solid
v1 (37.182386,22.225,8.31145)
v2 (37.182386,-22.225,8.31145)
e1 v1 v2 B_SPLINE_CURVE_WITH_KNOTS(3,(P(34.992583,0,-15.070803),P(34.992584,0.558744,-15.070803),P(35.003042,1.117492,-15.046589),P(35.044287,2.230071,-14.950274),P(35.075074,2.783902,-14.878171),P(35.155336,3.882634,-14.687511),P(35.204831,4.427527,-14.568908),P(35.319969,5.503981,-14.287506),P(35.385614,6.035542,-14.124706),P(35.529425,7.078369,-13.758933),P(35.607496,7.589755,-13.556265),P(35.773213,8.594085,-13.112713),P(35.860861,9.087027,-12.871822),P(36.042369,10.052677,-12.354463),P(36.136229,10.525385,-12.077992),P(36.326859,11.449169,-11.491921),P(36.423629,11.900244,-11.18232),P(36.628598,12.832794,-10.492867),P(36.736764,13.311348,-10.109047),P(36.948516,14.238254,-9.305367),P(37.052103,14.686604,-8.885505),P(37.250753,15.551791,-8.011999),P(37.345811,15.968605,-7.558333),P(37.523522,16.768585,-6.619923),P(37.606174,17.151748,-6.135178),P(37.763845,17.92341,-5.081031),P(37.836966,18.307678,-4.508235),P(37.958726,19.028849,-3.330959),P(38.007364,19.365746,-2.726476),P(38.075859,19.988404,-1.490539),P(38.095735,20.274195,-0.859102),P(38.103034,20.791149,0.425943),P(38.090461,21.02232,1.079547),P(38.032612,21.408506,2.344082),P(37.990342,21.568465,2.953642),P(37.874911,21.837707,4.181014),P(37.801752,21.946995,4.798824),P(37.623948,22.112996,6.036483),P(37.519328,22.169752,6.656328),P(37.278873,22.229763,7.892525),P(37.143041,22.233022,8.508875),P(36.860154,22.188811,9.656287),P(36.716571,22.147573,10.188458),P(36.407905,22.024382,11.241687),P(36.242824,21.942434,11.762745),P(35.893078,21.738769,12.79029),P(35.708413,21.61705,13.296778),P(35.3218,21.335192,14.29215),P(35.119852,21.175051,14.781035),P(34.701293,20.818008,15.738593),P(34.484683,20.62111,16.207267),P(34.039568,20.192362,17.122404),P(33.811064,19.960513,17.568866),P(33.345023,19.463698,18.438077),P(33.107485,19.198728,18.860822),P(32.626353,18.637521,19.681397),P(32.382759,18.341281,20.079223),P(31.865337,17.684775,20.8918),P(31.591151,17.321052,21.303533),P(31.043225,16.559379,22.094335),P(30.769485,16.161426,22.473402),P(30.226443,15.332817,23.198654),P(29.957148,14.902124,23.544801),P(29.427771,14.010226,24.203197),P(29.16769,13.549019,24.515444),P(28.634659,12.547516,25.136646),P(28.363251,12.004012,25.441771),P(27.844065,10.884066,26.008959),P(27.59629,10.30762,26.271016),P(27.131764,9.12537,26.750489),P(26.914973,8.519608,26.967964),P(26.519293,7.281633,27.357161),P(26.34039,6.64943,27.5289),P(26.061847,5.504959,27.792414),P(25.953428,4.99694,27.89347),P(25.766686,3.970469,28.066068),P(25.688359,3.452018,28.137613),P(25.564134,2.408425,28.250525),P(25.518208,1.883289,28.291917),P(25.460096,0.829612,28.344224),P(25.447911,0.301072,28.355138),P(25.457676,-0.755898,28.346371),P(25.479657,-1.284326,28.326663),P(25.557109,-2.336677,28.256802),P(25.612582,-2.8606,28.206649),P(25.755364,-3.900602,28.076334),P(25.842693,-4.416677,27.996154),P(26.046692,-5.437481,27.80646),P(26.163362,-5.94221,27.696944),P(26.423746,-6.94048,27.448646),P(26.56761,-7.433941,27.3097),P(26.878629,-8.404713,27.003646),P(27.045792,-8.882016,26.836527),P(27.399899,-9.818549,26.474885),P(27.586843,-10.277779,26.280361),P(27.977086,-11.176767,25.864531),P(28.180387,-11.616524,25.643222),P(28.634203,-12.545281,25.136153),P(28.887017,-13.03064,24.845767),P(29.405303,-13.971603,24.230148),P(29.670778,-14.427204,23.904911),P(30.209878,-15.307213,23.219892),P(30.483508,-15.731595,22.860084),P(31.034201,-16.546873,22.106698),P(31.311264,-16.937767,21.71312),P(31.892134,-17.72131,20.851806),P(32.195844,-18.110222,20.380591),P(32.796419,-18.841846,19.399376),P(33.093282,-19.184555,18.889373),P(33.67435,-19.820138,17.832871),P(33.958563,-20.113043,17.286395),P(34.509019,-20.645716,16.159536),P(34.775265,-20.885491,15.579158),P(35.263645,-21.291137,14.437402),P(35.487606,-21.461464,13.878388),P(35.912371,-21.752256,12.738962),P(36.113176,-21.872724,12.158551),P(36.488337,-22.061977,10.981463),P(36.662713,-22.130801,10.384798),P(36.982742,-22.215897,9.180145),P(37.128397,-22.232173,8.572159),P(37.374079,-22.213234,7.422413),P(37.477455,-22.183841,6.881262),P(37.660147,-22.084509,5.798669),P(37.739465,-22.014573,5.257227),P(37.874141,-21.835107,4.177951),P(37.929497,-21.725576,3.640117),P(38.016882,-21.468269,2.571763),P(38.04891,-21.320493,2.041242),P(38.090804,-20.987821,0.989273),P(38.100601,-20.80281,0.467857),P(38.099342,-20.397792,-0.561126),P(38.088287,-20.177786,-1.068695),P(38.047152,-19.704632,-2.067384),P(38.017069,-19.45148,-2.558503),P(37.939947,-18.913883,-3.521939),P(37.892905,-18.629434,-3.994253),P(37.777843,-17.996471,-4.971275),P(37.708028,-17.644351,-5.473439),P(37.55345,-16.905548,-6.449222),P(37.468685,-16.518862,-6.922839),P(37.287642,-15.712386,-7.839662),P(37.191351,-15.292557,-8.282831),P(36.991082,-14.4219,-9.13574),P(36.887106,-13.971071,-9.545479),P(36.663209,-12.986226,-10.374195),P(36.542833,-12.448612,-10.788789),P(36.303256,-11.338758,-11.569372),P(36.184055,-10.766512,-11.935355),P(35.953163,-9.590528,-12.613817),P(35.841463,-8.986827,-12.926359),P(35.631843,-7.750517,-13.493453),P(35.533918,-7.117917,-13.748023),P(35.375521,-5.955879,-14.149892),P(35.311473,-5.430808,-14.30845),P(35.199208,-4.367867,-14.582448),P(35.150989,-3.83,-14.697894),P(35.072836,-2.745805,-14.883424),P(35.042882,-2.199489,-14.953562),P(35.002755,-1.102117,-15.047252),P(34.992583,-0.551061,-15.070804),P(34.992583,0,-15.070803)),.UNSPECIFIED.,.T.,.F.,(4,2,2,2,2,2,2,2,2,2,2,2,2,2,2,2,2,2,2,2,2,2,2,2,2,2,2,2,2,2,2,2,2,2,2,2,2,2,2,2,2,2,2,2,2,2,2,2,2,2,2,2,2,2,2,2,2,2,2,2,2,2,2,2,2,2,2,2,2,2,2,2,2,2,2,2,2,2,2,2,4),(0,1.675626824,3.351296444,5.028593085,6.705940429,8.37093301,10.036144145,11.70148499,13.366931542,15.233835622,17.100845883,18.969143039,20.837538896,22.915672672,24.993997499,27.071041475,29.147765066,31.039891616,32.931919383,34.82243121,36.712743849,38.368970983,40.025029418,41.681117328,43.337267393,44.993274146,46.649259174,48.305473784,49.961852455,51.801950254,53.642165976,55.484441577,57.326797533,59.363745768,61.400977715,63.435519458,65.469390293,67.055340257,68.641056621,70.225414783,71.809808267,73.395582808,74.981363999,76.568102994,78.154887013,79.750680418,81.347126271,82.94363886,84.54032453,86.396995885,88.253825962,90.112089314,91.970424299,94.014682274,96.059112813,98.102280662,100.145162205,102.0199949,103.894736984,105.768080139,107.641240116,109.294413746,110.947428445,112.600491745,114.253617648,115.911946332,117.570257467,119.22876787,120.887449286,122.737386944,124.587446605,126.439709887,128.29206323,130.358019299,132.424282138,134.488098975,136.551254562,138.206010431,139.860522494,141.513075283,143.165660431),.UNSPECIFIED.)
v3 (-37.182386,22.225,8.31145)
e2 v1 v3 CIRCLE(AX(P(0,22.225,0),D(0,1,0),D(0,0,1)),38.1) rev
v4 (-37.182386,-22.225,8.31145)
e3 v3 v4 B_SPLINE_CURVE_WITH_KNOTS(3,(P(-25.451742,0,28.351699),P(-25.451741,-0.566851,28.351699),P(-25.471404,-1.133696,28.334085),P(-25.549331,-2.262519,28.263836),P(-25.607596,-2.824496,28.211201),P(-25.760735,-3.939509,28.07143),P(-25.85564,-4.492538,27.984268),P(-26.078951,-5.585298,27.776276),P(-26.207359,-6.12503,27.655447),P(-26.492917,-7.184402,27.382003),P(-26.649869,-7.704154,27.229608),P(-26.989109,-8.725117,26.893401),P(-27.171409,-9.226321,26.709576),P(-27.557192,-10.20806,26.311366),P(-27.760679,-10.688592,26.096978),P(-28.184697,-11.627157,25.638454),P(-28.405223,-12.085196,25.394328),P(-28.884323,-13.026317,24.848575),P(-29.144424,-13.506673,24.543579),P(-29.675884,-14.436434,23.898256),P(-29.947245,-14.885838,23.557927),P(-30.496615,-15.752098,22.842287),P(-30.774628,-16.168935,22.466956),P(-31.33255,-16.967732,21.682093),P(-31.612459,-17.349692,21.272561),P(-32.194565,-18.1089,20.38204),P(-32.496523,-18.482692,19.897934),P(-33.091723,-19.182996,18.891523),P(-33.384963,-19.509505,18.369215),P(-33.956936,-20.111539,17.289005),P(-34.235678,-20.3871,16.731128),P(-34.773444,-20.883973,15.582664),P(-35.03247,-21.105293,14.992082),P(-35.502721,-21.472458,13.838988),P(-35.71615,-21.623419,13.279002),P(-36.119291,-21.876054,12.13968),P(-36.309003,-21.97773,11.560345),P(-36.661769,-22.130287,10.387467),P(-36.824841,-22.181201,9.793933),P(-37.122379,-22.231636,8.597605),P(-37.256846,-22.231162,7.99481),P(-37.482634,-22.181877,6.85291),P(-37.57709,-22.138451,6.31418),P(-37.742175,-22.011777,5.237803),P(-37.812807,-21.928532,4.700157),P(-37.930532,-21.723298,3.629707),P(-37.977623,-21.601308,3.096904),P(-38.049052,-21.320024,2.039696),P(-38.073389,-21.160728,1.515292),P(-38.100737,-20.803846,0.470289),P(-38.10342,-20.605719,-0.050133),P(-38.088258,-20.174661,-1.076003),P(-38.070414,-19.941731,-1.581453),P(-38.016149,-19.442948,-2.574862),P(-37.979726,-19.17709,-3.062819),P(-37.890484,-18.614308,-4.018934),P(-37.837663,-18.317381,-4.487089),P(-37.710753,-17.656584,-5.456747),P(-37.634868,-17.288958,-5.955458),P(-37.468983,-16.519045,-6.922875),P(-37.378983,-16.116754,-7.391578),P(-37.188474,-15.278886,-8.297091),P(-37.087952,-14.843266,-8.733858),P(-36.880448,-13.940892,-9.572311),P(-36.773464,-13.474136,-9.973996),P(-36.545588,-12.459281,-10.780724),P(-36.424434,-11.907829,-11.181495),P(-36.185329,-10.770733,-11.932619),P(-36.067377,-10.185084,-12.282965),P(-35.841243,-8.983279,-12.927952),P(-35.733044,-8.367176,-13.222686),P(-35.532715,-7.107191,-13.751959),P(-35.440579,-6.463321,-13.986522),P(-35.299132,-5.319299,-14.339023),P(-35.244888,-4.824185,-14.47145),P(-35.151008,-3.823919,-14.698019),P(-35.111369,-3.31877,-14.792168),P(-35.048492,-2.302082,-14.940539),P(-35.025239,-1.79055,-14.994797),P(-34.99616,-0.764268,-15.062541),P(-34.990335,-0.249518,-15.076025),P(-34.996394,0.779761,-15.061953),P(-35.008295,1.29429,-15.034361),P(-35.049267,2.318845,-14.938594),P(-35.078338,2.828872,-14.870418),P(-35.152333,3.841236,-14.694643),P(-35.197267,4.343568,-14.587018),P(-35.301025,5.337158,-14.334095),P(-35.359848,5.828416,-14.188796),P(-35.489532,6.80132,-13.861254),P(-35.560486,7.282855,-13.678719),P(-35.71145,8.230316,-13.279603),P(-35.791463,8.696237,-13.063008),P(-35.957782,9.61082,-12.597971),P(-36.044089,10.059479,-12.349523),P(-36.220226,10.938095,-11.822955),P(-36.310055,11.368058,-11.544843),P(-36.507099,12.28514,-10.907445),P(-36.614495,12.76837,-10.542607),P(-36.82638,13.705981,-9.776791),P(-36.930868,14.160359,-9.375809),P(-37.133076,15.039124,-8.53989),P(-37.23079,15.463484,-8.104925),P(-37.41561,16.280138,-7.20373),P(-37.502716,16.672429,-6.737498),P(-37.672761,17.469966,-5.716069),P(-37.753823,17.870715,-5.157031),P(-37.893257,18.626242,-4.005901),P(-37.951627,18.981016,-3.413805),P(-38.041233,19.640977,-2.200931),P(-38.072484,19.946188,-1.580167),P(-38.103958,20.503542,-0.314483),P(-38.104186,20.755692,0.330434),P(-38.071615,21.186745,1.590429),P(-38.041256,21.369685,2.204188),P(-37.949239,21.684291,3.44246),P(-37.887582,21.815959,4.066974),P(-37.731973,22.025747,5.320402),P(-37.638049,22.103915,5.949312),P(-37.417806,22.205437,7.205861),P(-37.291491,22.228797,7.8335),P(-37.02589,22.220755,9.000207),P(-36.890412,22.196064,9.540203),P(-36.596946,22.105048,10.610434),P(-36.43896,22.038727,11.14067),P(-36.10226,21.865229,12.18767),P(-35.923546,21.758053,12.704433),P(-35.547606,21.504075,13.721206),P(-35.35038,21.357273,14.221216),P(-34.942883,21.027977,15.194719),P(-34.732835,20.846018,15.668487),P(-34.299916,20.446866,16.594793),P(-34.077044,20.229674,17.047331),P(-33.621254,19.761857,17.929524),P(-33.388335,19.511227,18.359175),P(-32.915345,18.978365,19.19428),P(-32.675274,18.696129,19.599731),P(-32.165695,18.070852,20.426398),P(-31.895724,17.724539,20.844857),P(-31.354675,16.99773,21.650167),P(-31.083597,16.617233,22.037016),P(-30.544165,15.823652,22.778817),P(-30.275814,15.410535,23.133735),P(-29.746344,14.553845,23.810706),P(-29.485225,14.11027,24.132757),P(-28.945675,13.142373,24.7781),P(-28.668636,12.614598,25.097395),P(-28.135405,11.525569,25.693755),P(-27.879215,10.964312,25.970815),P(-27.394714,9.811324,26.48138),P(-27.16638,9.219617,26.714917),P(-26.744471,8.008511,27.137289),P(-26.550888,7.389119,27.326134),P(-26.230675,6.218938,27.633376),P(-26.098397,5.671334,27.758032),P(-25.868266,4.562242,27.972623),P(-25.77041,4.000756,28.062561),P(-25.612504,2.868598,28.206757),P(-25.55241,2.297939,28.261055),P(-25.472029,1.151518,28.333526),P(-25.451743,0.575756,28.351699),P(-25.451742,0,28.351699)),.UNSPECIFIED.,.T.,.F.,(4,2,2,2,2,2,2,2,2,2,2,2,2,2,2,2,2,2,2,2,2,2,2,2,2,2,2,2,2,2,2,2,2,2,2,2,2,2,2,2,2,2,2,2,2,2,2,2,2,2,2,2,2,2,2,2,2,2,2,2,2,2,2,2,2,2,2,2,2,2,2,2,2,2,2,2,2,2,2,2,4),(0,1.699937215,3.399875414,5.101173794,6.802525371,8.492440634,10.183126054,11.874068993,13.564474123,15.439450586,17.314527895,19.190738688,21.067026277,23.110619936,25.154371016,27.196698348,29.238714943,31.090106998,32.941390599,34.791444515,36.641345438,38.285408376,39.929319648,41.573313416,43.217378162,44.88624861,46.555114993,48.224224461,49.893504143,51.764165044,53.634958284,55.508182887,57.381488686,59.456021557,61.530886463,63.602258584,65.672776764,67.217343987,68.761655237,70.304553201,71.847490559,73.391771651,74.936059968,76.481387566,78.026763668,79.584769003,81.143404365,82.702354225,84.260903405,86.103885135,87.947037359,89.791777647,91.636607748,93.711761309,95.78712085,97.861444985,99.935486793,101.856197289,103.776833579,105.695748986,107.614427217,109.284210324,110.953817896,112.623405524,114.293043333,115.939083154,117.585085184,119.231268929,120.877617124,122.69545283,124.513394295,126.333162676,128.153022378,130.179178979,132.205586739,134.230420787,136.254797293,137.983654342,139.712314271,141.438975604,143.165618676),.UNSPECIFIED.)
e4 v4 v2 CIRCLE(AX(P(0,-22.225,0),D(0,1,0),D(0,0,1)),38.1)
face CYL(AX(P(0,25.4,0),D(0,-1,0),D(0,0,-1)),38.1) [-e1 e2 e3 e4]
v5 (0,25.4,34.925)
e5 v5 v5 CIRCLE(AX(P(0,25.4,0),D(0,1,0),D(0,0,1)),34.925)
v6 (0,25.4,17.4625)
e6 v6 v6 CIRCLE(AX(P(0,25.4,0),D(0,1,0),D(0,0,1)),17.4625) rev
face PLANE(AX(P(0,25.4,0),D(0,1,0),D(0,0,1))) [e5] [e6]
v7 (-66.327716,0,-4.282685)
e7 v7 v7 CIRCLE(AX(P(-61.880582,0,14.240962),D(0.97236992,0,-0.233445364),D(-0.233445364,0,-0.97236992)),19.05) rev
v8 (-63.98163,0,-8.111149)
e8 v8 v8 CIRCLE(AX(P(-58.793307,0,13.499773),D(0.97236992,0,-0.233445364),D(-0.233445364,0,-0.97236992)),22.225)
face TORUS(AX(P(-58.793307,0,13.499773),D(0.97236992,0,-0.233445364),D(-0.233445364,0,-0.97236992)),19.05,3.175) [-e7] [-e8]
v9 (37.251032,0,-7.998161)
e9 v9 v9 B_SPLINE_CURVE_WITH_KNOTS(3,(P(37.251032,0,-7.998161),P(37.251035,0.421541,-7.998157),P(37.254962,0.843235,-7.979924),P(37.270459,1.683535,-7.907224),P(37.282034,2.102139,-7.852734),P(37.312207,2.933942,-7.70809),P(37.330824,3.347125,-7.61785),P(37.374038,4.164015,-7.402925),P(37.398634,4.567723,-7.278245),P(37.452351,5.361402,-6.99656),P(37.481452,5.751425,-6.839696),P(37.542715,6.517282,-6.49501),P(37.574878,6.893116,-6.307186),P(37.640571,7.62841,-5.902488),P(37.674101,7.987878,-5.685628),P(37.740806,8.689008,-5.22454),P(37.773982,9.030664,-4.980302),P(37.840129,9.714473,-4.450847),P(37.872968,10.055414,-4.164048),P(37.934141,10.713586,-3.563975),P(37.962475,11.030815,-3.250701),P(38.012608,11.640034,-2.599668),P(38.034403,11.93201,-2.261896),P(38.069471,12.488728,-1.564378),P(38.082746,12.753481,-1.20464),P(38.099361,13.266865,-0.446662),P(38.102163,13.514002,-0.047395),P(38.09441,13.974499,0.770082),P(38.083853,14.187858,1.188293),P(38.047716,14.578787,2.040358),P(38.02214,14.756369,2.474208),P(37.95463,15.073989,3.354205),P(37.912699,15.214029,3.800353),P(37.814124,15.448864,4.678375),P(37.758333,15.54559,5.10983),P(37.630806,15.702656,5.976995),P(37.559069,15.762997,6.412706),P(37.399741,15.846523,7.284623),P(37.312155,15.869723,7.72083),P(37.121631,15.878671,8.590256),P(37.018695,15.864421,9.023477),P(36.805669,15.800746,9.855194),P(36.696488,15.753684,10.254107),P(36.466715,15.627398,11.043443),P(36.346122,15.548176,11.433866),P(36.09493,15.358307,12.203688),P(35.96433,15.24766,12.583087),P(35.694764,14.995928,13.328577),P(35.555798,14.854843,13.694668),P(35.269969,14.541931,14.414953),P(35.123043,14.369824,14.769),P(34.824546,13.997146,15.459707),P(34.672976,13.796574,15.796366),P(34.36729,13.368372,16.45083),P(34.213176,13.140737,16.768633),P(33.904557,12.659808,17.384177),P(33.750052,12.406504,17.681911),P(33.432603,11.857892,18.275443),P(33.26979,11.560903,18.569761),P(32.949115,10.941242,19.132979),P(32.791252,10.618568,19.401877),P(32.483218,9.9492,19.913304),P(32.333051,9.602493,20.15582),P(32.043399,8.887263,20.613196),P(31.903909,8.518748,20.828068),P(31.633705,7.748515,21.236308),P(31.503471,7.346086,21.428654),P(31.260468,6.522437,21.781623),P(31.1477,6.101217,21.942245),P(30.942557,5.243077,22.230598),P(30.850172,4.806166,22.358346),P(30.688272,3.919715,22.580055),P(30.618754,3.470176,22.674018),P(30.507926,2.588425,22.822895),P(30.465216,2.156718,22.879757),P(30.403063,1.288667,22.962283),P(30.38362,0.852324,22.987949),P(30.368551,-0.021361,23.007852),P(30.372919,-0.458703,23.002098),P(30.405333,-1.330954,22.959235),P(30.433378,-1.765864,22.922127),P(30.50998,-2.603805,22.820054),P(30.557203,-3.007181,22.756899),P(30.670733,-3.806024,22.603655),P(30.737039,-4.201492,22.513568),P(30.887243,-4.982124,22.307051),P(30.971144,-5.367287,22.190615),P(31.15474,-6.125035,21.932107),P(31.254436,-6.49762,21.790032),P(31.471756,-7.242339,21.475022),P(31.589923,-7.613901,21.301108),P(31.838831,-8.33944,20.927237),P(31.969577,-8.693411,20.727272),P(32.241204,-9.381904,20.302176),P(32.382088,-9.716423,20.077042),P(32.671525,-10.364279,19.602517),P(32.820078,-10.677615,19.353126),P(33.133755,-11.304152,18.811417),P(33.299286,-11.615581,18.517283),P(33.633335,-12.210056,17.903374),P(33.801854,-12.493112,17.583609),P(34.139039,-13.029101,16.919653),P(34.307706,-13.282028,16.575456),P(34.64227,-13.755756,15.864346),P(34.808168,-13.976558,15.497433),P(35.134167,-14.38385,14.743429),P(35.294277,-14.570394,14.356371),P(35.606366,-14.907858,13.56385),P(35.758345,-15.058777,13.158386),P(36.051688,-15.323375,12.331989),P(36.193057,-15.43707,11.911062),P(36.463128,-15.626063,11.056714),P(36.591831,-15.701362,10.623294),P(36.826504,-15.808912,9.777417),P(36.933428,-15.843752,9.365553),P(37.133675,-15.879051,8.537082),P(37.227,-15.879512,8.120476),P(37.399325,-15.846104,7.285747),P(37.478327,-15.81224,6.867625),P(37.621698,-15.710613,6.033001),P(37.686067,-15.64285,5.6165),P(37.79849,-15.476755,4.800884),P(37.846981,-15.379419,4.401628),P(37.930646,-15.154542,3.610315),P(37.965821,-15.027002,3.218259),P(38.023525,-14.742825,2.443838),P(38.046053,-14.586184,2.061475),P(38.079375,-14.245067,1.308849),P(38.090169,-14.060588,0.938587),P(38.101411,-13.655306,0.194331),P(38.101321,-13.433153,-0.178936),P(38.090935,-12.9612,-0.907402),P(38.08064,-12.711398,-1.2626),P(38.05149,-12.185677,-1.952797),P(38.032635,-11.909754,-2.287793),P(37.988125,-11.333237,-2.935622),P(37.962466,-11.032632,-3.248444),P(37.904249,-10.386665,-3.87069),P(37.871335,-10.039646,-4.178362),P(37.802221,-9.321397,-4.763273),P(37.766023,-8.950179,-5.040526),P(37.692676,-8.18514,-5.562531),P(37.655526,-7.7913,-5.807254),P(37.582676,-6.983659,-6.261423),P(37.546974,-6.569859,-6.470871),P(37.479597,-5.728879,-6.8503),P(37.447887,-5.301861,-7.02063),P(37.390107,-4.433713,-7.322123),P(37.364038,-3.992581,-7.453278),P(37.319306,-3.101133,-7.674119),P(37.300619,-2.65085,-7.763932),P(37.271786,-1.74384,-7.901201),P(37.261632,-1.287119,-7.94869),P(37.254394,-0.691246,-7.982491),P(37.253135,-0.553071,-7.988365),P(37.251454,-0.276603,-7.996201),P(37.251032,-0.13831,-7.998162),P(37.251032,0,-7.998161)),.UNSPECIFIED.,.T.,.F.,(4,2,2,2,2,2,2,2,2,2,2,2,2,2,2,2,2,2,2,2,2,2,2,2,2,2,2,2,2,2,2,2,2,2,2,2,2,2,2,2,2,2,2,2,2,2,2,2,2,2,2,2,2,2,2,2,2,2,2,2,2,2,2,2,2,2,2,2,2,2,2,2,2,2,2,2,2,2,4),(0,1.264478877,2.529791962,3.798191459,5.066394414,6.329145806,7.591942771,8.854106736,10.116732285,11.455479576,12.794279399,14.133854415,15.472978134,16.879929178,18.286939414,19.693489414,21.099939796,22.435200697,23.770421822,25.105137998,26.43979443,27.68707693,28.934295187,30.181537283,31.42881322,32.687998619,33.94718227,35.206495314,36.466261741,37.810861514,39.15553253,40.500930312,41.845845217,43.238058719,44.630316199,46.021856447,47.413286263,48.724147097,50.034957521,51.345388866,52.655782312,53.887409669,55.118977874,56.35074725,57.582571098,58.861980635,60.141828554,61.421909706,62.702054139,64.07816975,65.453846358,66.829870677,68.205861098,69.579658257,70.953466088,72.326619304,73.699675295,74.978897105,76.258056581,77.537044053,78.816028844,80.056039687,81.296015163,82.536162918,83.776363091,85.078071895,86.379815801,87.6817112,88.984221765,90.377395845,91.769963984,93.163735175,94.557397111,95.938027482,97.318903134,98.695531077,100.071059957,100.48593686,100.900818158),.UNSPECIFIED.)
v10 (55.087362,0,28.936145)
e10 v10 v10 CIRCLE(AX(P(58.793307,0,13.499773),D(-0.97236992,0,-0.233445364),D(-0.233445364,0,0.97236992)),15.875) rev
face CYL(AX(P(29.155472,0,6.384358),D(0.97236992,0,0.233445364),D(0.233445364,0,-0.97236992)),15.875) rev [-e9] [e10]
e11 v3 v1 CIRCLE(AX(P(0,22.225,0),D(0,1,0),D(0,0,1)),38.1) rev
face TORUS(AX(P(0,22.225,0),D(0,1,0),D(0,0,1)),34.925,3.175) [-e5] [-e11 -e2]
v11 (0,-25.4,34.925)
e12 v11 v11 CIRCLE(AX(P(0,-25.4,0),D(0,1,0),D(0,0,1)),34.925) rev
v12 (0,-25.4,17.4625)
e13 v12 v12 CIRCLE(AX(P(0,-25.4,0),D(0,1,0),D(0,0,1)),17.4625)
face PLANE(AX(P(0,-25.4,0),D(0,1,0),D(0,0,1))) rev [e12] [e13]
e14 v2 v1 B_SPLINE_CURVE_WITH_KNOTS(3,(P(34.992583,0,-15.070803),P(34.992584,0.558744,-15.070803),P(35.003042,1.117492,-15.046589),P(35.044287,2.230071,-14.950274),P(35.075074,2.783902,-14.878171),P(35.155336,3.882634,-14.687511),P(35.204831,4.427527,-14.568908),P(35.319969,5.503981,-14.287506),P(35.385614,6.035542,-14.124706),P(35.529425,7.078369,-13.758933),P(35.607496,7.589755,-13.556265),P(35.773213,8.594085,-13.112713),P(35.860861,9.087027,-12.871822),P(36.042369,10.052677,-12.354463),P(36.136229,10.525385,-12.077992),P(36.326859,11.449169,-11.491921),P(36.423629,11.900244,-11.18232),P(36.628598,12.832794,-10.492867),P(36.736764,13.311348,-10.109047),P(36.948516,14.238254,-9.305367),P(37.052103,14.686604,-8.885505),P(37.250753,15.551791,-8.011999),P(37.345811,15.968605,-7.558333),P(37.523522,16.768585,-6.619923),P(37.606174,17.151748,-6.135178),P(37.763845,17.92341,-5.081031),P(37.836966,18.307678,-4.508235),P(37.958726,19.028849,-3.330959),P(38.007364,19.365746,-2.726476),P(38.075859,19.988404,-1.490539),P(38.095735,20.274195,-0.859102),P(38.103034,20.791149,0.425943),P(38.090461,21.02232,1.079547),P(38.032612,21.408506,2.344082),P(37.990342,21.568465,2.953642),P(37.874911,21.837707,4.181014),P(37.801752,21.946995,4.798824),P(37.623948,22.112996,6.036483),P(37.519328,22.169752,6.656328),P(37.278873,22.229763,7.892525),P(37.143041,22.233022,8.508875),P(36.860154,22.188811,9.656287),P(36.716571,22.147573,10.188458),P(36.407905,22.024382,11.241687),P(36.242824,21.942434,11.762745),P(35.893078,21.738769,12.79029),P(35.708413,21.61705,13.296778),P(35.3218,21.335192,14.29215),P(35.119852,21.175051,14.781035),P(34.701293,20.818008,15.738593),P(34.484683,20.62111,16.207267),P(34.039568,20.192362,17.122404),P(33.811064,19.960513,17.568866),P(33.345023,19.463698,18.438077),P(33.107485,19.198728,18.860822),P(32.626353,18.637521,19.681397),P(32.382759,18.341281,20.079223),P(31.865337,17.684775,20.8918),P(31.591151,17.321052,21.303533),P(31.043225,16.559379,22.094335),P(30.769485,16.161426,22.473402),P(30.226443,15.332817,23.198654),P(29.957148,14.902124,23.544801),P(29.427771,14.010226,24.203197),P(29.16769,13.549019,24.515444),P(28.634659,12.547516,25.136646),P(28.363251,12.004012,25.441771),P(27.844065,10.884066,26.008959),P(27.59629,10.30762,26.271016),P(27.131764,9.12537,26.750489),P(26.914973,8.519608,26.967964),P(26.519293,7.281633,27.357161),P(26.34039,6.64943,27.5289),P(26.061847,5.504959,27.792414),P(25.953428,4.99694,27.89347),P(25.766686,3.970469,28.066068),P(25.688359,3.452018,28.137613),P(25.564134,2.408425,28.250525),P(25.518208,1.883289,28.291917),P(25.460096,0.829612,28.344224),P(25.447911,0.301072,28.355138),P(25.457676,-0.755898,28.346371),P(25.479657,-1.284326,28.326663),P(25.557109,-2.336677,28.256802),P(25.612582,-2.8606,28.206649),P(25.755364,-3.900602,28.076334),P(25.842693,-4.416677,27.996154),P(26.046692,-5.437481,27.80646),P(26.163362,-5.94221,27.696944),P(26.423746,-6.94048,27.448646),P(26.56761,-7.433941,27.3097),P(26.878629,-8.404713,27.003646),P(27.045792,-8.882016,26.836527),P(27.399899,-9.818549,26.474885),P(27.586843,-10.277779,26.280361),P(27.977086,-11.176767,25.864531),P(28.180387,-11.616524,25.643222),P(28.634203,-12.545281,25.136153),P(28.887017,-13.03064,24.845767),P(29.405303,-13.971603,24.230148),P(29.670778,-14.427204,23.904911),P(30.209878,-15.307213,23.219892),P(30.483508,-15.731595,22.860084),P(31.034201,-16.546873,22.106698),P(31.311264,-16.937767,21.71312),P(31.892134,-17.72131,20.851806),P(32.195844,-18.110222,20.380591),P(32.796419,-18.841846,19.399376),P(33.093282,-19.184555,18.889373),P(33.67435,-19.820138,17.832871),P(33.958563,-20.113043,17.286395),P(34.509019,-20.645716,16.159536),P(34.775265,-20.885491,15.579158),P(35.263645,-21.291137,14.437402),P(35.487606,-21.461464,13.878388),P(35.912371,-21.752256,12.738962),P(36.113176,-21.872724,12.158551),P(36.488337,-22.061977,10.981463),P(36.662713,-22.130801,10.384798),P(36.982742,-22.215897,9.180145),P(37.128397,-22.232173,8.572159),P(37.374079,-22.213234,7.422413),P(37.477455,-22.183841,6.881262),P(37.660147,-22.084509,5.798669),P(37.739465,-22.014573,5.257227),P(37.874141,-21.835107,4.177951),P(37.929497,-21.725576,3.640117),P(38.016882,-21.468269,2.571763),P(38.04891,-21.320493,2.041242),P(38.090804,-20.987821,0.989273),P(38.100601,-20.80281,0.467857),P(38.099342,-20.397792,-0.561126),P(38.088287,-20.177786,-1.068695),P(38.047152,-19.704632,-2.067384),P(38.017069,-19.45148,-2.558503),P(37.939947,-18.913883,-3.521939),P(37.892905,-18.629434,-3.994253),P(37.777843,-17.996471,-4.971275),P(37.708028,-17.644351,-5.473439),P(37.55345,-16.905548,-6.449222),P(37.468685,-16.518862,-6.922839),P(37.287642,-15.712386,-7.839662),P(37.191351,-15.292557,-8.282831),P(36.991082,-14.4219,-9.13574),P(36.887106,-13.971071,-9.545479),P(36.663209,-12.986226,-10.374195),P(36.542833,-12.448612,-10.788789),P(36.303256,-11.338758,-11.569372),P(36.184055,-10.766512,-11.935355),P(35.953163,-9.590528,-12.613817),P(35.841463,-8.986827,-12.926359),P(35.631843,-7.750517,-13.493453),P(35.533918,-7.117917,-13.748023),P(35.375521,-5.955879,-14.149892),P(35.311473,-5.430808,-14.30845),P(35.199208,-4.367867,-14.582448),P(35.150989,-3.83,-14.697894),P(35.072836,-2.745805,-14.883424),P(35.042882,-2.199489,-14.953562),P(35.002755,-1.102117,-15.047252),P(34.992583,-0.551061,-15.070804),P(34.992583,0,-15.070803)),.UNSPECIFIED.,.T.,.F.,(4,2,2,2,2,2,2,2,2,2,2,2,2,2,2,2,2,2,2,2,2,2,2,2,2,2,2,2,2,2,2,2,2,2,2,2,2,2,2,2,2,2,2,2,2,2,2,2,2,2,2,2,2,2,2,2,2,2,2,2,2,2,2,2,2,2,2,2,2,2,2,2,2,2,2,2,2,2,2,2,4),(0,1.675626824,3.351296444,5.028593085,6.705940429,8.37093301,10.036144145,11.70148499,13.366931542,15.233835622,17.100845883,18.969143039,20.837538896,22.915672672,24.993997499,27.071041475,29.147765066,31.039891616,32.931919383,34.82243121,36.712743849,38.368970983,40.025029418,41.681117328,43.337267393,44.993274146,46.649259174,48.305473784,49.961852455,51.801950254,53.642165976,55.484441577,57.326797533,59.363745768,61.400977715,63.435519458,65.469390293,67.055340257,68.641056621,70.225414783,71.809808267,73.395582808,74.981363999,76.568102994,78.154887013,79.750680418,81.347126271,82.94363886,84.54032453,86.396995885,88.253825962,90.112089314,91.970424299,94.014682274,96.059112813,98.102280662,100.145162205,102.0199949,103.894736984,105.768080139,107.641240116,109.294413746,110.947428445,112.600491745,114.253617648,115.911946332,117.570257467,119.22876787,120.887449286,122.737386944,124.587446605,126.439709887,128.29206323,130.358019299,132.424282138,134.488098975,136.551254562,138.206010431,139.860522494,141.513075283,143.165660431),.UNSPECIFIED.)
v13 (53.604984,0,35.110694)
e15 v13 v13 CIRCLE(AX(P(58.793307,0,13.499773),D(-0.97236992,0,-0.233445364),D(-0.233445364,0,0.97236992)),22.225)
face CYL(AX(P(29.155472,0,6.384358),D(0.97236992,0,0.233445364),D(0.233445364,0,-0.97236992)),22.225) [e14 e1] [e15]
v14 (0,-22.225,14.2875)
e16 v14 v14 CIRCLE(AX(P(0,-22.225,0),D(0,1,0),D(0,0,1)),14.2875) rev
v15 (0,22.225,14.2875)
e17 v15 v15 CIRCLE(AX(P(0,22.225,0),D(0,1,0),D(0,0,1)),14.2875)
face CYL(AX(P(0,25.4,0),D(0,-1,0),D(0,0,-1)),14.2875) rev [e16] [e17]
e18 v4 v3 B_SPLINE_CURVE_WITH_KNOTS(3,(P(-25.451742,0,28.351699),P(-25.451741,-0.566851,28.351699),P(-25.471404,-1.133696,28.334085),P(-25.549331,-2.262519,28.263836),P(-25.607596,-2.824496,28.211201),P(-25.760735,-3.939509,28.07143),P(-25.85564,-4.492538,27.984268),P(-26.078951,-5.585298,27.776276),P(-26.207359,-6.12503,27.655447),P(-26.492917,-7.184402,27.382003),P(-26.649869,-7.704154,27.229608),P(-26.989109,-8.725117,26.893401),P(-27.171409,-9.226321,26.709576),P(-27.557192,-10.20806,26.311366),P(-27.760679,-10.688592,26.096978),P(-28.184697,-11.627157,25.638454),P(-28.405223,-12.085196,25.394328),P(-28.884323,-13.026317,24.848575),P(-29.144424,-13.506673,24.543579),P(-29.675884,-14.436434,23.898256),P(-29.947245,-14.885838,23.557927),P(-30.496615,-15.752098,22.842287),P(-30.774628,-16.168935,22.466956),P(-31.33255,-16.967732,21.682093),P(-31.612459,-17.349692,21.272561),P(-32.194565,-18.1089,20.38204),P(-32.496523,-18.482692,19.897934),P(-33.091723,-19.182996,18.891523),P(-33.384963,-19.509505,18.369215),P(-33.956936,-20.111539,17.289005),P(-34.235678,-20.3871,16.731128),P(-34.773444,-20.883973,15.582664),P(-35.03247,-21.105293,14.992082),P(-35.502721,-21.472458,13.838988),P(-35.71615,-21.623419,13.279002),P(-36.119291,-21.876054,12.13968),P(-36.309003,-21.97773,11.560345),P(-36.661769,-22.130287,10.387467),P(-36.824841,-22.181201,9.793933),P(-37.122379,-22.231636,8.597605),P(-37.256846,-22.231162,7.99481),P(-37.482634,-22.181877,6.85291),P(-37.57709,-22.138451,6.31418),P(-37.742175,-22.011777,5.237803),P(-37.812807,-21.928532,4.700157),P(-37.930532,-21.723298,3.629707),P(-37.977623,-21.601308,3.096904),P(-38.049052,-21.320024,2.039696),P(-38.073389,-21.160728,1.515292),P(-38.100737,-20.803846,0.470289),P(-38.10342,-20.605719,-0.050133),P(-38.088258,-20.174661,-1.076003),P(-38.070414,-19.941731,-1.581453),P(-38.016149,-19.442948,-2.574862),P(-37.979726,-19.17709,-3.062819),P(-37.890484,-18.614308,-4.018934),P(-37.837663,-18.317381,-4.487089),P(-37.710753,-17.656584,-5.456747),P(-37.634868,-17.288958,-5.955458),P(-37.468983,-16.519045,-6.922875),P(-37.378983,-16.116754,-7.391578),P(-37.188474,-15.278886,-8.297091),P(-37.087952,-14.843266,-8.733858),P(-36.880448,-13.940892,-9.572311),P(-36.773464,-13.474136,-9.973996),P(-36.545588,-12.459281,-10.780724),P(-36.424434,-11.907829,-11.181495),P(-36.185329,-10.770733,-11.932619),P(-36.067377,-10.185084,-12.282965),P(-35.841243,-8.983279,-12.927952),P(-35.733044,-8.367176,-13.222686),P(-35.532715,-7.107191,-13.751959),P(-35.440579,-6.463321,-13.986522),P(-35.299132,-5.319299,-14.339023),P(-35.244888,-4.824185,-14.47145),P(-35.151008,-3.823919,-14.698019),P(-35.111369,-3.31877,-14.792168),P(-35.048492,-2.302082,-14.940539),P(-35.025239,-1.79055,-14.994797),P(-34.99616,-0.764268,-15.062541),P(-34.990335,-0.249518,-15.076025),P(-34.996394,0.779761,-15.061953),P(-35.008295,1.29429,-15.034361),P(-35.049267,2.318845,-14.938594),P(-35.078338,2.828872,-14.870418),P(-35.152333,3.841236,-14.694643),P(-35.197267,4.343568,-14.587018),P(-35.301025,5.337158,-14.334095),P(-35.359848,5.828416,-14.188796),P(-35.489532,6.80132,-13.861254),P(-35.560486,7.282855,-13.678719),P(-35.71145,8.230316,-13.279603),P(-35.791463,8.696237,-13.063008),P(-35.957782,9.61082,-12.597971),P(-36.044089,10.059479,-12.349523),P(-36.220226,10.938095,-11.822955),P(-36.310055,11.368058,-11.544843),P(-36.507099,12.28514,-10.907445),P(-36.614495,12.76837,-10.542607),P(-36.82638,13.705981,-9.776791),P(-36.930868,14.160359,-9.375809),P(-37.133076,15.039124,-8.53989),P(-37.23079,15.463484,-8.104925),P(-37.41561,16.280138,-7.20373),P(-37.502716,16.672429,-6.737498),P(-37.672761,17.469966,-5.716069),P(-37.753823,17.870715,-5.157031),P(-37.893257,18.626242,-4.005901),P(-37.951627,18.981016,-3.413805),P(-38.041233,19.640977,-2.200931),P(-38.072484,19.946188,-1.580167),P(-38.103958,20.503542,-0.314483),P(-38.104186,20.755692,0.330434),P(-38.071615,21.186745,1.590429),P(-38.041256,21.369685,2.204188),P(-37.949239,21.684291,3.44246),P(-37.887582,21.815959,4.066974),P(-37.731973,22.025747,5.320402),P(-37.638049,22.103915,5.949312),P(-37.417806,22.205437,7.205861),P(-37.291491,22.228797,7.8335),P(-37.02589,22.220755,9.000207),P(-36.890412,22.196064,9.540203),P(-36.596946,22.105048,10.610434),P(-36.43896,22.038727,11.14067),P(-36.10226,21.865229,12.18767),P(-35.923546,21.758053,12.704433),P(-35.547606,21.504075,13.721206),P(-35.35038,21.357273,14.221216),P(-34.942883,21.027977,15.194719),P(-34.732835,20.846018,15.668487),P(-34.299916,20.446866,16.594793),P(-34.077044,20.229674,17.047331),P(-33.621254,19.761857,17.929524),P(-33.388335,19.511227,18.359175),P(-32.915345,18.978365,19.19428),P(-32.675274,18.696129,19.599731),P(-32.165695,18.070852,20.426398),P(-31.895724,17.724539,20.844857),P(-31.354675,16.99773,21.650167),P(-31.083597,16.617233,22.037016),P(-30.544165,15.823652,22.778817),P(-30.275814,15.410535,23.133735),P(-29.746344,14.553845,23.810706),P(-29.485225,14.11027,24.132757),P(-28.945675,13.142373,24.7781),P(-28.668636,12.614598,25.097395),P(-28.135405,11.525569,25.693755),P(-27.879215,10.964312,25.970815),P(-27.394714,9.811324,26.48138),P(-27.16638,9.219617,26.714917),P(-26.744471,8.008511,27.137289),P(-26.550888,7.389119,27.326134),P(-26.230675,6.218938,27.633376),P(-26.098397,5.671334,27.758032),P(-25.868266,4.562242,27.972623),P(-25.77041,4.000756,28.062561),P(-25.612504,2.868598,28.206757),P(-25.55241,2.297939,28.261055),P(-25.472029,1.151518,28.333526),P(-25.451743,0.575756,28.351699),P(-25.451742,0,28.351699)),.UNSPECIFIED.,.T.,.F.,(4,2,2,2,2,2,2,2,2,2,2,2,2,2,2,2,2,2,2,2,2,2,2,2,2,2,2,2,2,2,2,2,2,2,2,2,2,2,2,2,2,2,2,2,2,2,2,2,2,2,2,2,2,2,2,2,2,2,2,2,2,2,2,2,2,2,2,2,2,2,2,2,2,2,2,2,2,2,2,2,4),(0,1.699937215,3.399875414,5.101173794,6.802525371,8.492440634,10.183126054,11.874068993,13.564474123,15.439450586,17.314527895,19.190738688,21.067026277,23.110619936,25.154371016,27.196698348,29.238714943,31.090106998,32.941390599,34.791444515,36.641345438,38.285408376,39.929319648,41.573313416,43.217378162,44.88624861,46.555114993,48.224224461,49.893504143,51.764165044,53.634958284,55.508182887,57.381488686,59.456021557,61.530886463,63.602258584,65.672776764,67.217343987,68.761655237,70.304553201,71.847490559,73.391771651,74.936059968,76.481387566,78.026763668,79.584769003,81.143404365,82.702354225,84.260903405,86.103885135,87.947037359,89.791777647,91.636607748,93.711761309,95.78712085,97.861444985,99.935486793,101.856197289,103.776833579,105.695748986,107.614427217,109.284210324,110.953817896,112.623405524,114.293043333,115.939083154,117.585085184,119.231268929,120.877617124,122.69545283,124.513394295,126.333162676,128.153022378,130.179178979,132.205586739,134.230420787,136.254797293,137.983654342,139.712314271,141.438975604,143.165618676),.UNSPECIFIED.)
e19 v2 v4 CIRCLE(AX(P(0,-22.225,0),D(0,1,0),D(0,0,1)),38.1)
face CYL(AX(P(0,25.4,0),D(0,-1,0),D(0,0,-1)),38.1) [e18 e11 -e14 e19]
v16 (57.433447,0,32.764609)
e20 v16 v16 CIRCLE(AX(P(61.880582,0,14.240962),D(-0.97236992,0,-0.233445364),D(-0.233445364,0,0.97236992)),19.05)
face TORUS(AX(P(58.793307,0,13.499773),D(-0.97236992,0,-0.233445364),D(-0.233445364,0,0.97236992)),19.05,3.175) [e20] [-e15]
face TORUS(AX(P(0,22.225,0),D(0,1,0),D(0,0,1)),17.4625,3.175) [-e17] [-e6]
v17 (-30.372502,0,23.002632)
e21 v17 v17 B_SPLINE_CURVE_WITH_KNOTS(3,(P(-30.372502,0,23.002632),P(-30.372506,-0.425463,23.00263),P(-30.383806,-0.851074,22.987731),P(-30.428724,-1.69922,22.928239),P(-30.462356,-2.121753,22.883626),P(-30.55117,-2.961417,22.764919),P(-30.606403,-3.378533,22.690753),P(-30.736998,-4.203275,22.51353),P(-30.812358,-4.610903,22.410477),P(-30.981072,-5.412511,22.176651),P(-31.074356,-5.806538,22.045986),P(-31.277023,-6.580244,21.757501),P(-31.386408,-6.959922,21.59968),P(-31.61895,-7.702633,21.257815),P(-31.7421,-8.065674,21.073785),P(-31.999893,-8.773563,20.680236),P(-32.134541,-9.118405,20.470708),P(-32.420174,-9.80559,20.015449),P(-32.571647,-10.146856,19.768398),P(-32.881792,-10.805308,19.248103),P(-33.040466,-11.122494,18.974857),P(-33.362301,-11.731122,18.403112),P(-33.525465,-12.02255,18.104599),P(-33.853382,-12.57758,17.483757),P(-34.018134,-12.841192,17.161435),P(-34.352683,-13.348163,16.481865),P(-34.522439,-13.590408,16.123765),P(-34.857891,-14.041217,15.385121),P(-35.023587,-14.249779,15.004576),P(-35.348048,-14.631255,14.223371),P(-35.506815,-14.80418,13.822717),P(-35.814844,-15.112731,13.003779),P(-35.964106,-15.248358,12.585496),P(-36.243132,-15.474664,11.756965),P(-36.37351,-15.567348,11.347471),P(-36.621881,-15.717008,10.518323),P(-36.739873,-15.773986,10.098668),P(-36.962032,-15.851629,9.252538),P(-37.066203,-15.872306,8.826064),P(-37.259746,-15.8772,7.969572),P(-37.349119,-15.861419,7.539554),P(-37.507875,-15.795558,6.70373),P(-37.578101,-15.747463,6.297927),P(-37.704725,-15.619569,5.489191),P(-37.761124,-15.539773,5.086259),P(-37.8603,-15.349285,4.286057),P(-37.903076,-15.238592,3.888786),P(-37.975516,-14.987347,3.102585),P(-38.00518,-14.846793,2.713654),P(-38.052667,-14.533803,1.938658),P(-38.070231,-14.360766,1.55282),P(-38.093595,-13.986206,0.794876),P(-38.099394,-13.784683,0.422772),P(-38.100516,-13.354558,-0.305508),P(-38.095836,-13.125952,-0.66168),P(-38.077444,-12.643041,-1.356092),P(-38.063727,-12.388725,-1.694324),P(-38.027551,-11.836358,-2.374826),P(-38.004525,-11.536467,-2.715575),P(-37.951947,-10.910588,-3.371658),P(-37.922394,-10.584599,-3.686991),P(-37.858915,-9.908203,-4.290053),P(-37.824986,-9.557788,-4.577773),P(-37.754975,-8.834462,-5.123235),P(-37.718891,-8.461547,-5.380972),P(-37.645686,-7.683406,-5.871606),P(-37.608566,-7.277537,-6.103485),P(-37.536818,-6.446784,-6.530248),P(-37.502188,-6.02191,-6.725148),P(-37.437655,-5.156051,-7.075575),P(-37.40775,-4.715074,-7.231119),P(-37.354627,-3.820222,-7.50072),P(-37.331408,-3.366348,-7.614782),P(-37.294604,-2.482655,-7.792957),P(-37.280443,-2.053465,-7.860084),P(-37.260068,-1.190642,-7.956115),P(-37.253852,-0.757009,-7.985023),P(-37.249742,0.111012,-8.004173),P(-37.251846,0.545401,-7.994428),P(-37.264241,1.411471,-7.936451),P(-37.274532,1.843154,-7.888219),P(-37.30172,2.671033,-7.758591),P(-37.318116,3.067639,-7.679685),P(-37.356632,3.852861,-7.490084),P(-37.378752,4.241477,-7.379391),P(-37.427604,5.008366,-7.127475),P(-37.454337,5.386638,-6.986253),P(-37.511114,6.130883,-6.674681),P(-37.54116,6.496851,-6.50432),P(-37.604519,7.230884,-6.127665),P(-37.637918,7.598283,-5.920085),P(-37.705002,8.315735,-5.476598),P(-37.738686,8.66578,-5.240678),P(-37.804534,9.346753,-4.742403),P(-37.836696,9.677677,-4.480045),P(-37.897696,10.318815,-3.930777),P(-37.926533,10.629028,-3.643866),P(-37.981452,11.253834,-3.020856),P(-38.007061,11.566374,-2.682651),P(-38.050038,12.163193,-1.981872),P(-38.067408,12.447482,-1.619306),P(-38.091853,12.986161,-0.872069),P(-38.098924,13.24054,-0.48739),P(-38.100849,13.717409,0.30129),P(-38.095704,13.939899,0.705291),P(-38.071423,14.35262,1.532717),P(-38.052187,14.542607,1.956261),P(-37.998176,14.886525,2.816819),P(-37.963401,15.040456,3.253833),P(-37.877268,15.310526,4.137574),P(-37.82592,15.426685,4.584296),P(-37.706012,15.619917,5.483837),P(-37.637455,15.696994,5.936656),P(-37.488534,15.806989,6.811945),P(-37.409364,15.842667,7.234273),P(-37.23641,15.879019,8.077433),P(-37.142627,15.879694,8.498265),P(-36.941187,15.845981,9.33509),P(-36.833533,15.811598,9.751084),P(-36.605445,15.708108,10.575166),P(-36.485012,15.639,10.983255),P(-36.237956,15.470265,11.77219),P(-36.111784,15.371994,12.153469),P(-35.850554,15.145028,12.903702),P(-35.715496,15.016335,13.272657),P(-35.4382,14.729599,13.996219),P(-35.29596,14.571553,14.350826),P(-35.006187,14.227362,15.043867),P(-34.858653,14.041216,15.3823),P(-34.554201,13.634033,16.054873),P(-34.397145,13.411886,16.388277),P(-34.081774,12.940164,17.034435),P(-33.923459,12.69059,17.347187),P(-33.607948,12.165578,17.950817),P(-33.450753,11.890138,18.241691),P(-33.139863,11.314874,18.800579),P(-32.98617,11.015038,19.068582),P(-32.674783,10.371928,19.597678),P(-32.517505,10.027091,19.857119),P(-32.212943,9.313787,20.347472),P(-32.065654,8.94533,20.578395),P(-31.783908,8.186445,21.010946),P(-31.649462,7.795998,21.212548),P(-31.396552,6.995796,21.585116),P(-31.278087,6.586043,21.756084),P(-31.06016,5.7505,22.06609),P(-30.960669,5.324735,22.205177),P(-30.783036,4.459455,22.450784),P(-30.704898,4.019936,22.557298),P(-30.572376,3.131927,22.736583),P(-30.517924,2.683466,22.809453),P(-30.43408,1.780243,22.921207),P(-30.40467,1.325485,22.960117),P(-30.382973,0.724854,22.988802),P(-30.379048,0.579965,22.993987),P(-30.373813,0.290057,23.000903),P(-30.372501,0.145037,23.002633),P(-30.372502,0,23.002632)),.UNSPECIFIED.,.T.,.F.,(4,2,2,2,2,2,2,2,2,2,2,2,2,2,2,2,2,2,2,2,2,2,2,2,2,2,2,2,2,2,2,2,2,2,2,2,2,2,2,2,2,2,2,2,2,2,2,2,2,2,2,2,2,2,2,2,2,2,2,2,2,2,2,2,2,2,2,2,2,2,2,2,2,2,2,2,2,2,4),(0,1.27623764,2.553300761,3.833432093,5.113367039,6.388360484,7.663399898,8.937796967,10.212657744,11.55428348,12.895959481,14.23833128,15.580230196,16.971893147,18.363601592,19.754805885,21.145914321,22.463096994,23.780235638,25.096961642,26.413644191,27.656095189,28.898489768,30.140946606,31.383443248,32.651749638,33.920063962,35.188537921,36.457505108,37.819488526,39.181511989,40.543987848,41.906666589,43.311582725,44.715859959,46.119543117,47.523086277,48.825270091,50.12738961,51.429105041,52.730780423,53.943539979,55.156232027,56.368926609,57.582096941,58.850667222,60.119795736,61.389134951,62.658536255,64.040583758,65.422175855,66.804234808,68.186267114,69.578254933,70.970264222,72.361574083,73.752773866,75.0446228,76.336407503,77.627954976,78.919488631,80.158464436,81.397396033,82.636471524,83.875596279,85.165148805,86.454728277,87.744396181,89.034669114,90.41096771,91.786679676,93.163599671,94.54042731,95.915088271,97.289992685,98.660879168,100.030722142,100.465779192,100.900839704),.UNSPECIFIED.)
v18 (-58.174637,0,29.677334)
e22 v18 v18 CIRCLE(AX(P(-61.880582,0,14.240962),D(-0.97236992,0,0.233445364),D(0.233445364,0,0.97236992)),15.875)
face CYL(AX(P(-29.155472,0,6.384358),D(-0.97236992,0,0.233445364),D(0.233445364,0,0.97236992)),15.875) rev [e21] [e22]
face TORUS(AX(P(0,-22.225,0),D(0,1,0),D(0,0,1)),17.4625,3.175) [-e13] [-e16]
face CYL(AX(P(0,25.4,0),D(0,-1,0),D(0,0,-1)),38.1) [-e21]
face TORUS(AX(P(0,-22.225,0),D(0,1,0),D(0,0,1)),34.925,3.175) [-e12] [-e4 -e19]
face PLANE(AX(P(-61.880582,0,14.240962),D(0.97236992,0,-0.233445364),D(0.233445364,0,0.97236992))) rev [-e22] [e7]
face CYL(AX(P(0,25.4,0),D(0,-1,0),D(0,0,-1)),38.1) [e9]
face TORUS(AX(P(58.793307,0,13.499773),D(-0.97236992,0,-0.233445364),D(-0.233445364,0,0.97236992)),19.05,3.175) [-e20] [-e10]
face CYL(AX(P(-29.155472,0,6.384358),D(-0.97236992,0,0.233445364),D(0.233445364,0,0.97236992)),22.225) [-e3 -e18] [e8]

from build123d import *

# Parameters (mm, degrees)
SKETCH1_R           = 38.1
SKETCH1_R_2         = 14.2875
BOSS_EXTRUDE1_DEPTH = 25.4
BOSS_EXTRUDE2_START = -25.4
SKETCH3_R           = 22.225
SKETCH3_R_2         = 15.875
BOSS_EXTRUDE2_DEPTH = 33.655
FILLET1_R           = 3.175


with BuildPart() as part:
    # Sketch1 → Boss-Extrude1 (new, symmetric)
    with BuildSketch(Plane(origin=(0, 0, 0), x_dir=(1, 0, 0), z_dir=(0, 1, 0))):
        with Locations(Location((0, 0, 0), (0, 0, 270))):
            Circle(SKETCH1_R)
        with Locations(Location((0, 0, 0), (0, 0, 270))):
            Circle(SKETCH1_R_2, mode=Mode.SUBTRACT)
    extrude(amount=BOSS_EXTRUDE1_DEPTH, both=True)

    # Sketch3 → Boss-Extrude2 (add)
    with BuildSketch(Plane(origin=(37.182385695, 0, 8.311449576), x_dir=(-0.2334453638559059, 0, 0.9723699203976764), z_dir=(-0.9723699203976764, 0, -0.2334453638559059)).offset(BOSS_EXTRUDE2_START)):
        with Locations(Location((0, 0, 0), (0, 0, 180))):
            Circle(SKETCH3_R)
        with Locations(Location((0, 0, 0), (0, 0, 180))):
            Circle(SKETCH3_R_2, mode=Mode.SUBTRACT)
    boss_extrude2 = extrude(amount=BOSS_EXTRUDE2_DEPTH)

    # Mirror1: Boss-Extrude2 across plane
    add(boss_extrude2.mirror(Plane(origin=(0, 0, 0), x_dir=(0, 0, 1), z_dir=(1, 0, 0))))

    # Fillet1
    fillet1_edges = [part.edges().sort_by_distance(p)[0] for p in [
        (0, 25.4, -14.2875),
        (56.692258461, 0, 35.851883299),
        (58.174636521, 0, 29.677334305),
        (-56.692258461, 0, 35.851883299),
        (0, -25.4, -14.2875),
        (0, -25.4, -38.1),
        (0, 25.4, -38.1),
    ]]
    fillet(fillet1_edges, radius=FILLET1_R - 0.0001)  # a hair under: the kernel refuses the full size


solid = part.part
